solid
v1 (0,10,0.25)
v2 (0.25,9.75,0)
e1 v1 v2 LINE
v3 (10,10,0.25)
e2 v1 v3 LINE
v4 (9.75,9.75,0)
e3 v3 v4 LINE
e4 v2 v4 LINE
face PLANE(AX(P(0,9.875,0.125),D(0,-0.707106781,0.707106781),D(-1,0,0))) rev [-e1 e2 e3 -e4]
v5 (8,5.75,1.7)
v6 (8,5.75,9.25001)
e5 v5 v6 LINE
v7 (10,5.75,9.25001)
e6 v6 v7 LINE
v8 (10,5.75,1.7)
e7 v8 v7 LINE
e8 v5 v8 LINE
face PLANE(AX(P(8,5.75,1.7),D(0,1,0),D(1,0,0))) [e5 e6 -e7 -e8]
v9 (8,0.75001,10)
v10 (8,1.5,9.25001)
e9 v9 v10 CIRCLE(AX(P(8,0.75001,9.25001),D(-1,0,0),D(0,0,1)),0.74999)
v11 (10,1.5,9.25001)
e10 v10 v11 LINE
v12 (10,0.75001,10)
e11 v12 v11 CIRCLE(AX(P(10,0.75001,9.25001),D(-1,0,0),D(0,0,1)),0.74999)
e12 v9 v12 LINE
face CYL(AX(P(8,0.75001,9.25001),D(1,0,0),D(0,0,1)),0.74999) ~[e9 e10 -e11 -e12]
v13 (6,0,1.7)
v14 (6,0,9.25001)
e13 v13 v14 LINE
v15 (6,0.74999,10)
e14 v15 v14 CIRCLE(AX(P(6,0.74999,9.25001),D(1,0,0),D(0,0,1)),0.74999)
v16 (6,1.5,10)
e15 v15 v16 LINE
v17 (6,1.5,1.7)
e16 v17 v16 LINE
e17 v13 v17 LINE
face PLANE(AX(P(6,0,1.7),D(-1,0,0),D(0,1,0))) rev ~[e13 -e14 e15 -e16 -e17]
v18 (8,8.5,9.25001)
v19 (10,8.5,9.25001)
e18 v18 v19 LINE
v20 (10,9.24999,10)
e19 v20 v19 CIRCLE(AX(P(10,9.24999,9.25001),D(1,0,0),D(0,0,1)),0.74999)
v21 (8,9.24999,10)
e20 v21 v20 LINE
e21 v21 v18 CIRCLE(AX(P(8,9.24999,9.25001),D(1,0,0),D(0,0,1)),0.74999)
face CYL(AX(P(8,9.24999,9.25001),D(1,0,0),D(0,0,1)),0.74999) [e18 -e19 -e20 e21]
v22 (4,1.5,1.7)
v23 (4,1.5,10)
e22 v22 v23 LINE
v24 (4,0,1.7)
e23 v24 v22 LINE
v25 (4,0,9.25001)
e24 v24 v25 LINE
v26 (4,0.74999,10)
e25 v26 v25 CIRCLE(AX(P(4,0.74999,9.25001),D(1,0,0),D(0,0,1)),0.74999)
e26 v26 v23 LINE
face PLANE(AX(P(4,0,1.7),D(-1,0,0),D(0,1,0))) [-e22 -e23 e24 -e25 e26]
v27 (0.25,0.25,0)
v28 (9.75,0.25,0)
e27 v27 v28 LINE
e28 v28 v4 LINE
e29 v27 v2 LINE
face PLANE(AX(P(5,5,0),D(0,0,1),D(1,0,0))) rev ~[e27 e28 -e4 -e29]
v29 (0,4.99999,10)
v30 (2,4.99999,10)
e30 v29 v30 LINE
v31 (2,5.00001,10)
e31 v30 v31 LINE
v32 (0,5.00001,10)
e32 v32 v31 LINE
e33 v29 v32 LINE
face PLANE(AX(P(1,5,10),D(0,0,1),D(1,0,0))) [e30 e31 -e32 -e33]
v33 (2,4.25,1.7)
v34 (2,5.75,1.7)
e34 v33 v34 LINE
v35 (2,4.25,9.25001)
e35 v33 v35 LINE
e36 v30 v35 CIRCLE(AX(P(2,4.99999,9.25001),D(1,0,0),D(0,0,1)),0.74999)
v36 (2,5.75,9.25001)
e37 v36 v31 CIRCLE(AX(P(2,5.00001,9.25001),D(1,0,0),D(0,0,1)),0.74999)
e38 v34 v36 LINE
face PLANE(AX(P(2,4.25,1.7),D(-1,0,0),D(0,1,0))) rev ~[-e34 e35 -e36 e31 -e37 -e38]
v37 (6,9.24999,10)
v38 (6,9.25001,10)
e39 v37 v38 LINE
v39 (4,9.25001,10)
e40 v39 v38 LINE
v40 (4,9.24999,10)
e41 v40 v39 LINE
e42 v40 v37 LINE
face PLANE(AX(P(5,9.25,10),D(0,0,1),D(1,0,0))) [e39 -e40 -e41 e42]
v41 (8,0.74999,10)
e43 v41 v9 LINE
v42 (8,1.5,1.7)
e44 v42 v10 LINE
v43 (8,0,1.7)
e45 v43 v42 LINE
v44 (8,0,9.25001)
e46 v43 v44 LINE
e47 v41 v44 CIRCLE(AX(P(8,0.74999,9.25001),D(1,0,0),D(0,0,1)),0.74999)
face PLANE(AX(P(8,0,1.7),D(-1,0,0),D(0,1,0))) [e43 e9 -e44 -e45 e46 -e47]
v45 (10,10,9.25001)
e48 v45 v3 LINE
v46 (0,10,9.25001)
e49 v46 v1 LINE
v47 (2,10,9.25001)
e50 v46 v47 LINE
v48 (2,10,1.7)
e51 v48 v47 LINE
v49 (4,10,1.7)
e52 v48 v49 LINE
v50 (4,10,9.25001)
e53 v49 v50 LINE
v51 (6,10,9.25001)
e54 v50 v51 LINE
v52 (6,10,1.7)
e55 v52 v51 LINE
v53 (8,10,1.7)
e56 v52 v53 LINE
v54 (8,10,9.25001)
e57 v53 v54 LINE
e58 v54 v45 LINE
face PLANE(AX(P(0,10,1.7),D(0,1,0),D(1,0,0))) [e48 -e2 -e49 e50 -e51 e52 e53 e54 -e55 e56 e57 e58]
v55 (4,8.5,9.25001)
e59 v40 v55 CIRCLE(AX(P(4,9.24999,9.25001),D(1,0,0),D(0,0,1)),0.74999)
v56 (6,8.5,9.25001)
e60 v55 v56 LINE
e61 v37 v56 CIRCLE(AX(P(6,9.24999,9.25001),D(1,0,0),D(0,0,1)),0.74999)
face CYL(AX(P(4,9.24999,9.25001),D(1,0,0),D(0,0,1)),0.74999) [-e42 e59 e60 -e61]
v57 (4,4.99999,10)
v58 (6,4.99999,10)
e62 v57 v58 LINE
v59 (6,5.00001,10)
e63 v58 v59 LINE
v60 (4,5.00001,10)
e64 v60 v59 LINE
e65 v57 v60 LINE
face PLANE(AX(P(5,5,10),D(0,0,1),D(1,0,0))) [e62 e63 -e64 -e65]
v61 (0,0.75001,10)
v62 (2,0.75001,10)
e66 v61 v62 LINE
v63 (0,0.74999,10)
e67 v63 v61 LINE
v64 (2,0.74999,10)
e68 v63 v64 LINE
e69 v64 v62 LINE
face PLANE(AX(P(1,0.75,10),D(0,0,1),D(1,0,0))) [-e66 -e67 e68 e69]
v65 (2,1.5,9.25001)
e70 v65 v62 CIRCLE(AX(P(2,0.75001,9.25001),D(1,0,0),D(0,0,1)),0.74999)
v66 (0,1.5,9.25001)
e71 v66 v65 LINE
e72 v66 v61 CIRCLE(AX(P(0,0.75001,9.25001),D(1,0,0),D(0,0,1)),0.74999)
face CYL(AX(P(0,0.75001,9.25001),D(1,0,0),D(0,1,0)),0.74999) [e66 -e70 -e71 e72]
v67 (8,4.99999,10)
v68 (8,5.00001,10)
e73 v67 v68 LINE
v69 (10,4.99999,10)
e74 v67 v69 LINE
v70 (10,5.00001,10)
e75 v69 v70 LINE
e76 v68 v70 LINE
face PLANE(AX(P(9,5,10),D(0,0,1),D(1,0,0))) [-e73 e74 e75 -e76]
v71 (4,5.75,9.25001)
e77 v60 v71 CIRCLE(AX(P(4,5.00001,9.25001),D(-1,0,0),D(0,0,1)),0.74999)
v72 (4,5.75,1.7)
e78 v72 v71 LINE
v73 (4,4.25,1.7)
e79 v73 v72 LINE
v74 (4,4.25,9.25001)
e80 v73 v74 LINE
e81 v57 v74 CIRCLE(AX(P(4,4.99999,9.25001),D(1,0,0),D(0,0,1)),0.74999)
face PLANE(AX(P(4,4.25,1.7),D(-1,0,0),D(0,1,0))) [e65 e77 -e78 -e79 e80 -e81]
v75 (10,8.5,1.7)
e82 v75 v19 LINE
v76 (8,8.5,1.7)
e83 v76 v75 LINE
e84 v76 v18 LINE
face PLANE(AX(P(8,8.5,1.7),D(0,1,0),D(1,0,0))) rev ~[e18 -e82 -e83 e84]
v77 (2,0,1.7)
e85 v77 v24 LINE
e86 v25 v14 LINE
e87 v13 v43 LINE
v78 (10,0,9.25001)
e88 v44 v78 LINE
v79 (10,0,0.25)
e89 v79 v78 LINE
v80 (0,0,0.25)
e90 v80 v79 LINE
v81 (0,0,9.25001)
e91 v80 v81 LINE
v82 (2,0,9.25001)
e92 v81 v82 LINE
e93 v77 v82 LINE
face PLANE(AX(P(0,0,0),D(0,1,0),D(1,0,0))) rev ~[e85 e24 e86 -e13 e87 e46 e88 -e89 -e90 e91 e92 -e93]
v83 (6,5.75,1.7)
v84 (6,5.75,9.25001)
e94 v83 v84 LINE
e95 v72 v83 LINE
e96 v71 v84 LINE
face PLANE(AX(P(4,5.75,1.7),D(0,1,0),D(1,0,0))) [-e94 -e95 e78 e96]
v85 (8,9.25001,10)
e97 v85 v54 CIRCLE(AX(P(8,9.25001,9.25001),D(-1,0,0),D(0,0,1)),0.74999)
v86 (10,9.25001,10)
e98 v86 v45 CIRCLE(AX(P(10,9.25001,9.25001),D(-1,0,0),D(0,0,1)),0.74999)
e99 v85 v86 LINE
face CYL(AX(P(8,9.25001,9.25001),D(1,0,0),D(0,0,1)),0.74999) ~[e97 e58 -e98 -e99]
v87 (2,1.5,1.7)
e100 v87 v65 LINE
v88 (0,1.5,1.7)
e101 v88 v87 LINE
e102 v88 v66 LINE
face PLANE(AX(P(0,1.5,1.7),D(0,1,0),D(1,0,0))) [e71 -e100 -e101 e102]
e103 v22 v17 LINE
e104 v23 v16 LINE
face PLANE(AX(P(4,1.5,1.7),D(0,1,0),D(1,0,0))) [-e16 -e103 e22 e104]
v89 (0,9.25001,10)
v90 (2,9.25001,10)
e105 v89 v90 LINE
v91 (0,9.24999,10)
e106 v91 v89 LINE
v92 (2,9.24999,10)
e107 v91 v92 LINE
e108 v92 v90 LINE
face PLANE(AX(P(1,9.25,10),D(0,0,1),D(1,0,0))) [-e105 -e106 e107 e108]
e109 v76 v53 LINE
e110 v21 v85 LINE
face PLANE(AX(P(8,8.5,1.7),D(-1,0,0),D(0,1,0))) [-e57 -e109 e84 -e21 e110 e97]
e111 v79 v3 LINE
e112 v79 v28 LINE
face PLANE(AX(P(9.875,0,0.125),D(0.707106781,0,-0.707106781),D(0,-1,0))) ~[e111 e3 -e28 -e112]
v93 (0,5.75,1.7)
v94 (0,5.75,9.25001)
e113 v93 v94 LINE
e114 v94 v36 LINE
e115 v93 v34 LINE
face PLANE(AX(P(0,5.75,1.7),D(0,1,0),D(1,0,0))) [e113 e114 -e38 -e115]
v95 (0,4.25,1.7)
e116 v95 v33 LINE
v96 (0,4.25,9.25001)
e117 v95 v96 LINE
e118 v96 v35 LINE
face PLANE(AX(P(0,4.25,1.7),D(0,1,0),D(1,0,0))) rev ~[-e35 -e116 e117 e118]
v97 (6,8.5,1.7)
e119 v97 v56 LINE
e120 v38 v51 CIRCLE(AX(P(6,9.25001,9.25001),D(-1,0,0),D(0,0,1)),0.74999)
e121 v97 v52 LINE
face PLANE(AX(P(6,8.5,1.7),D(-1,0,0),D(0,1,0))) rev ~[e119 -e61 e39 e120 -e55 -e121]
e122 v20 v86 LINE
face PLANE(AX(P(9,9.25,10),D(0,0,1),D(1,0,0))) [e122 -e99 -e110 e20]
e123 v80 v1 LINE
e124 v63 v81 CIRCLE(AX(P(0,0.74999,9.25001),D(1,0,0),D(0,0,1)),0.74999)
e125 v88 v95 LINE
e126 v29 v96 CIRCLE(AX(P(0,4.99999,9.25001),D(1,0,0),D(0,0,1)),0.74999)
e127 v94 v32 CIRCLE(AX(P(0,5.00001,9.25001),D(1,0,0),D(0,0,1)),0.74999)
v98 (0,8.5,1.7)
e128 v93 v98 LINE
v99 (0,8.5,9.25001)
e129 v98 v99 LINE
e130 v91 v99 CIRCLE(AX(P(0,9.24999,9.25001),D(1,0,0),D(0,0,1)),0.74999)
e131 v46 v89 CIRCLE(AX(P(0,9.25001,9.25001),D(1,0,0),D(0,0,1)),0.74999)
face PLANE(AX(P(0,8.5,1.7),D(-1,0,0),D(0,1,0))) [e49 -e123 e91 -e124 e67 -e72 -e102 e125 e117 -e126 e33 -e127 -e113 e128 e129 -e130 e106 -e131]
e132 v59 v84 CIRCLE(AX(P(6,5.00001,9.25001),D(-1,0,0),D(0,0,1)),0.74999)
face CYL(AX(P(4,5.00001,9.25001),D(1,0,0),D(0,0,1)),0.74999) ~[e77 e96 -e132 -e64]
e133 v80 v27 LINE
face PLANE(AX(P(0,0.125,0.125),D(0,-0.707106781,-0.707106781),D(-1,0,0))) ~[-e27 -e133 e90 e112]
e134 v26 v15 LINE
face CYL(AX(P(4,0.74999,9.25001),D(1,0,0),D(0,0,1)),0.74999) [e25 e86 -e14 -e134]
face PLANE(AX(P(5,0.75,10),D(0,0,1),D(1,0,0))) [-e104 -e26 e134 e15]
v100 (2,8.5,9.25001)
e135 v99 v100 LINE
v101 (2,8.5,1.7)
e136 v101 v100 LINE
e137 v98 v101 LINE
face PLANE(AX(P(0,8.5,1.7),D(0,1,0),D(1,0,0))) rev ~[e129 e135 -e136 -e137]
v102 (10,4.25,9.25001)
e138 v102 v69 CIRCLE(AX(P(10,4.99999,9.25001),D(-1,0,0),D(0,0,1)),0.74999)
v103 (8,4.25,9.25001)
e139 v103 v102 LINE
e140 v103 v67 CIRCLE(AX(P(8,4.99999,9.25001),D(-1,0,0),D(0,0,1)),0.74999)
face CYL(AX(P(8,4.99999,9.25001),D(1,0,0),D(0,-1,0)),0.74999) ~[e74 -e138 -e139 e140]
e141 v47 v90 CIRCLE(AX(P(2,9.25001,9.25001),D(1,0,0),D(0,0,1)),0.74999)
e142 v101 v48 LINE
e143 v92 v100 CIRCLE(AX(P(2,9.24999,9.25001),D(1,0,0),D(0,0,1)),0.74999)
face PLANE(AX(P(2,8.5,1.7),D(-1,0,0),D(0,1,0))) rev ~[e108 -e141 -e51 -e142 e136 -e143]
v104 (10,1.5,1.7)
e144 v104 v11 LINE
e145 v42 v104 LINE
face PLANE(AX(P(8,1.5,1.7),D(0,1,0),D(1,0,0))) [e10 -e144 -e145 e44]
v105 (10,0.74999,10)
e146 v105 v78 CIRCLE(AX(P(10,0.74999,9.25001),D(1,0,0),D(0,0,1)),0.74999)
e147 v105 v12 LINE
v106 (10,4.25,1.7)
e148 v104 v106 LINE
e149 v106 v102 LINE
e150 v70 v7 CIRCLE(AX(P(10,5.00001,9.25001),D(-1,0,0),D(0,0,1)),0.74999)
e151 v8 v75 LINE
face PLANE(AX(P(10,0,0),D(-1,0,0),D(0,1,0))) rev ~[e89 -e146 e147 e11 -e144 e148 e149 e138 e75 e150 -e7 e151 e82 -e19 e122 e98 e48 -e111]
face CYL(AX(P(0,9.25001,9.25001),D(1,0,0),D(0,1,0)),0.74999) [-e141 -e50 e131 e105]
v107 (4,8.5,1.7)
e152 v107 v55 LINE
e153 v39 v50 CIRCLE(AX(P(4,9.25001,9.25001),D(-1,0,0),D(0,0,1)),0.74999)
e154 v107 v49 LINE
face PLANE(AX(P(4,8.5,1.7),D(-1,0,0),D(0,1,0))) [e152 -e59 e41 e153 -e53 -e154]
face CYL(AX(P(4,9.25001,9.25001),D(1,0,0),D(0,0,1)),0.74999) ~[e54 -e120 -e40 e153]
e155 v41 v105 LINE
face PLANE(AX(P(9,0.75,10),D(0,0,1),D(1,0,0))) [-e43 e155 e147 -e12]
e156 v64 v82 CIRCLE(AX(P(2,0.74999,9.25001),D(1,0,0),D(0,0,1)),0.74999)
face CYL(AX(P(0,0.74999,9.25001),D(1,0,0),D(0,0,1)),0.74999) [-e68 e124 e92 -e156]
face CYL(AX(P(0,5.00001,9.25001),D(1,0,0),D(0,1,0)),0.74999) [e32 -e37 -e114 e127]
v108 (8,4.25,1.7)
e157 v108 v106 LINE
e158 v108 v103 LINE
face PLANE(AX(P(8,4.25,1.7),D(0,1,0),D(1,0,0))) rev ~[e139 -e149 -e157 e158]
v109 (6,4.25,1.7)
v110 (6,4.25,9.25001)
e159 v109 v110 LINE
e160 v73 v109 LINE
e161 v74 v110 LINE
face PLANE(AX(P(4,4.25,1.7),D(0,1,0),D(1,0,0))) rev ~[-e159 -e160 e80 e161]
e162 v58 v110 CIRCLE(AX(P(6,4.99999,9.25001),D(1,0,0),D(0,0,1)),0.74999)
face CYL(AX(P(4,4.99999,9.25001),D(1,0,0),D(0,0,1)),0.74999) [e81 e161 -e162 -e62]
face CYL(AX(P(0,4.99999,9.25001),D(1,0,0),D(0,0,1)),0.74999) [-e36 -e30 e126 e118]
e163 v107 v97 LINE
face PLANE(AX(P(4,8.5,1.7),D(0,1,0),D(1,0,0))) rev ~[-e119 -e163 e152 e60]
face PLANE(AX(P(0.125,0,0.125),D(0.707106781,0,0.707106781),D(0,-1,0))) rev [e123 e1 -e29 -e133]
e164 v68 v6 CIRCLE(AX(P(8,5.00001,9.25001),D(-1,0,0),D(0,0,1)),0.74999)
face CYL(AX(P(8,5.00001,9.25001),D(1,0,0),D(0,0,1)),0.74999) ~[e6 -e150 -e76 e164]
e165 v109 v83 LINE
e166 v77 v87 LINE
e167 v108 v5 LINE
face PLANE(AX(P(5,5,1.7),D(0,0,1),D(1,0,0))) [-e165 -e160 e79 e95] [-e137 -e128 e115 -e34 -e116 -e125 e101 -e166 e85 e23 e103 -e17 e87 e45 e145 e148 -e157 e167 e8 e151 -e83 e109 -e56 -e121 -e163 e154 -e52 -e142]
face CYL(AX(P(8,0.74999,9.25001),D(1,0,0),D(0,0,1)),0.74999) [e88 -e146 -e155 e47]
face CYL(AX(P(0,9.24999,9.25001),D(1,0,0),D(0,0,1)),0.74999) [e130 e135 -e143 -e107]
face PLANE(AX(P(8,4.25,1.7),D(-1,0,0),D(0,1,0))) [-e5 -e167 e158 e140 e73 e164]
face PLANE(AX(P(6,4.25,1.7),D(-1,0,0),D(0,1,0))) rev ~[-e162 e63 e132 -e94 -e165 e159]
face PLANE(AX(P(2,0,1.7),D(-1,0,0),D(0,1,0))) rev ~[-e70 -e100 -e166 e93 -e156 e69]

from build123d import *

# Parameters (mm, degrees)
F0_W     = 10
F0_H     = 10
F1_DEPTH = 1.7
F2_SIZE  = 0.25
F3_W     = 2
F3_H     = 1.5
F4_DEPTH = 8.3
F5_R     = 0.74999


# Not quite as in the source:
# - a fillet or chamfer is up to 0.001 mm smaller than in the source, because OpenCascade refuses the exact size


with BuildPart() as f1:
    # F0 (on Top) → F1 (new body)
    with BuildSketch(Plane.XY):
        with Locations((5, 5)):
            Rectangle(F0_W, F0_H)
    extrude(amount=F1_DEPTH)

    # F2
    f2_edges = [f1.edges().sort_by_distance(p)[0] for p in [
        (5, 0, 0),
        (0, 5, 0),
        (10, 5, 0),
        (5, 10, 0),
    ]]
    chamfer(f2_edges, length=F2_SIZE)

    # F3 (on face) → F4 (join)
    with BuildSketch(Plane.XY.offset(1.7)):
        with Locations((1, 9.25)):
            Rectangle(F3_W, F3_H)
        with Locations((9, 9.25)):
            Rectangle(F3_W, F3_H)
        with Locations((1, 0.75)):
            Rectangle(F3_W, F3_H)
        with Locations((9, 0.75)):
            Rectangle(F3_W, F3_H)
        with Locations((1, 5)):
            Rectangle(F3_W, F3_H)
        with Locations((5, 9.25)):
            Rectangle(F3_W, F3_H)
        with Locations((9, 5)):
            Rectangle(F3_W, F3_H)
        with Locations((5, 5)):
            Rectangle(F3_W, F3_H)
        with Locations((5, 0.75)):
            Rectangle(F3_W, F3_H)
    extrude(amount=F4_DEPTH)

    # F5 (radius 0.75 in the source; OpenCascade refuses exactly that, so slightly less here)
    f5_edges = [f1.edges().sort_by_distance(p)[0] for p in [
        (1, 0, 10),
        (1, 1.5, 10),
        (5, 0, 10),
        (9, 0, 10),
        (9, 1.5, 10),
        (9, 4.25, 10),
        (9, 5.75, 10),
        (5, 4.25, 10),
        (5, 5.75, 10),
        (1, 4.25, 10),
        (1, 5.75, 10),
        (1, 8.5, 10),
        (1, 10, 10),
        (5, 8.5, 10),
        (5, 10, 10),
        (9, 8.5, 10),
        (9, 10, 10),
    ]]
    fillet(f5_edges, radius=F5_R)


solid = f1.part
